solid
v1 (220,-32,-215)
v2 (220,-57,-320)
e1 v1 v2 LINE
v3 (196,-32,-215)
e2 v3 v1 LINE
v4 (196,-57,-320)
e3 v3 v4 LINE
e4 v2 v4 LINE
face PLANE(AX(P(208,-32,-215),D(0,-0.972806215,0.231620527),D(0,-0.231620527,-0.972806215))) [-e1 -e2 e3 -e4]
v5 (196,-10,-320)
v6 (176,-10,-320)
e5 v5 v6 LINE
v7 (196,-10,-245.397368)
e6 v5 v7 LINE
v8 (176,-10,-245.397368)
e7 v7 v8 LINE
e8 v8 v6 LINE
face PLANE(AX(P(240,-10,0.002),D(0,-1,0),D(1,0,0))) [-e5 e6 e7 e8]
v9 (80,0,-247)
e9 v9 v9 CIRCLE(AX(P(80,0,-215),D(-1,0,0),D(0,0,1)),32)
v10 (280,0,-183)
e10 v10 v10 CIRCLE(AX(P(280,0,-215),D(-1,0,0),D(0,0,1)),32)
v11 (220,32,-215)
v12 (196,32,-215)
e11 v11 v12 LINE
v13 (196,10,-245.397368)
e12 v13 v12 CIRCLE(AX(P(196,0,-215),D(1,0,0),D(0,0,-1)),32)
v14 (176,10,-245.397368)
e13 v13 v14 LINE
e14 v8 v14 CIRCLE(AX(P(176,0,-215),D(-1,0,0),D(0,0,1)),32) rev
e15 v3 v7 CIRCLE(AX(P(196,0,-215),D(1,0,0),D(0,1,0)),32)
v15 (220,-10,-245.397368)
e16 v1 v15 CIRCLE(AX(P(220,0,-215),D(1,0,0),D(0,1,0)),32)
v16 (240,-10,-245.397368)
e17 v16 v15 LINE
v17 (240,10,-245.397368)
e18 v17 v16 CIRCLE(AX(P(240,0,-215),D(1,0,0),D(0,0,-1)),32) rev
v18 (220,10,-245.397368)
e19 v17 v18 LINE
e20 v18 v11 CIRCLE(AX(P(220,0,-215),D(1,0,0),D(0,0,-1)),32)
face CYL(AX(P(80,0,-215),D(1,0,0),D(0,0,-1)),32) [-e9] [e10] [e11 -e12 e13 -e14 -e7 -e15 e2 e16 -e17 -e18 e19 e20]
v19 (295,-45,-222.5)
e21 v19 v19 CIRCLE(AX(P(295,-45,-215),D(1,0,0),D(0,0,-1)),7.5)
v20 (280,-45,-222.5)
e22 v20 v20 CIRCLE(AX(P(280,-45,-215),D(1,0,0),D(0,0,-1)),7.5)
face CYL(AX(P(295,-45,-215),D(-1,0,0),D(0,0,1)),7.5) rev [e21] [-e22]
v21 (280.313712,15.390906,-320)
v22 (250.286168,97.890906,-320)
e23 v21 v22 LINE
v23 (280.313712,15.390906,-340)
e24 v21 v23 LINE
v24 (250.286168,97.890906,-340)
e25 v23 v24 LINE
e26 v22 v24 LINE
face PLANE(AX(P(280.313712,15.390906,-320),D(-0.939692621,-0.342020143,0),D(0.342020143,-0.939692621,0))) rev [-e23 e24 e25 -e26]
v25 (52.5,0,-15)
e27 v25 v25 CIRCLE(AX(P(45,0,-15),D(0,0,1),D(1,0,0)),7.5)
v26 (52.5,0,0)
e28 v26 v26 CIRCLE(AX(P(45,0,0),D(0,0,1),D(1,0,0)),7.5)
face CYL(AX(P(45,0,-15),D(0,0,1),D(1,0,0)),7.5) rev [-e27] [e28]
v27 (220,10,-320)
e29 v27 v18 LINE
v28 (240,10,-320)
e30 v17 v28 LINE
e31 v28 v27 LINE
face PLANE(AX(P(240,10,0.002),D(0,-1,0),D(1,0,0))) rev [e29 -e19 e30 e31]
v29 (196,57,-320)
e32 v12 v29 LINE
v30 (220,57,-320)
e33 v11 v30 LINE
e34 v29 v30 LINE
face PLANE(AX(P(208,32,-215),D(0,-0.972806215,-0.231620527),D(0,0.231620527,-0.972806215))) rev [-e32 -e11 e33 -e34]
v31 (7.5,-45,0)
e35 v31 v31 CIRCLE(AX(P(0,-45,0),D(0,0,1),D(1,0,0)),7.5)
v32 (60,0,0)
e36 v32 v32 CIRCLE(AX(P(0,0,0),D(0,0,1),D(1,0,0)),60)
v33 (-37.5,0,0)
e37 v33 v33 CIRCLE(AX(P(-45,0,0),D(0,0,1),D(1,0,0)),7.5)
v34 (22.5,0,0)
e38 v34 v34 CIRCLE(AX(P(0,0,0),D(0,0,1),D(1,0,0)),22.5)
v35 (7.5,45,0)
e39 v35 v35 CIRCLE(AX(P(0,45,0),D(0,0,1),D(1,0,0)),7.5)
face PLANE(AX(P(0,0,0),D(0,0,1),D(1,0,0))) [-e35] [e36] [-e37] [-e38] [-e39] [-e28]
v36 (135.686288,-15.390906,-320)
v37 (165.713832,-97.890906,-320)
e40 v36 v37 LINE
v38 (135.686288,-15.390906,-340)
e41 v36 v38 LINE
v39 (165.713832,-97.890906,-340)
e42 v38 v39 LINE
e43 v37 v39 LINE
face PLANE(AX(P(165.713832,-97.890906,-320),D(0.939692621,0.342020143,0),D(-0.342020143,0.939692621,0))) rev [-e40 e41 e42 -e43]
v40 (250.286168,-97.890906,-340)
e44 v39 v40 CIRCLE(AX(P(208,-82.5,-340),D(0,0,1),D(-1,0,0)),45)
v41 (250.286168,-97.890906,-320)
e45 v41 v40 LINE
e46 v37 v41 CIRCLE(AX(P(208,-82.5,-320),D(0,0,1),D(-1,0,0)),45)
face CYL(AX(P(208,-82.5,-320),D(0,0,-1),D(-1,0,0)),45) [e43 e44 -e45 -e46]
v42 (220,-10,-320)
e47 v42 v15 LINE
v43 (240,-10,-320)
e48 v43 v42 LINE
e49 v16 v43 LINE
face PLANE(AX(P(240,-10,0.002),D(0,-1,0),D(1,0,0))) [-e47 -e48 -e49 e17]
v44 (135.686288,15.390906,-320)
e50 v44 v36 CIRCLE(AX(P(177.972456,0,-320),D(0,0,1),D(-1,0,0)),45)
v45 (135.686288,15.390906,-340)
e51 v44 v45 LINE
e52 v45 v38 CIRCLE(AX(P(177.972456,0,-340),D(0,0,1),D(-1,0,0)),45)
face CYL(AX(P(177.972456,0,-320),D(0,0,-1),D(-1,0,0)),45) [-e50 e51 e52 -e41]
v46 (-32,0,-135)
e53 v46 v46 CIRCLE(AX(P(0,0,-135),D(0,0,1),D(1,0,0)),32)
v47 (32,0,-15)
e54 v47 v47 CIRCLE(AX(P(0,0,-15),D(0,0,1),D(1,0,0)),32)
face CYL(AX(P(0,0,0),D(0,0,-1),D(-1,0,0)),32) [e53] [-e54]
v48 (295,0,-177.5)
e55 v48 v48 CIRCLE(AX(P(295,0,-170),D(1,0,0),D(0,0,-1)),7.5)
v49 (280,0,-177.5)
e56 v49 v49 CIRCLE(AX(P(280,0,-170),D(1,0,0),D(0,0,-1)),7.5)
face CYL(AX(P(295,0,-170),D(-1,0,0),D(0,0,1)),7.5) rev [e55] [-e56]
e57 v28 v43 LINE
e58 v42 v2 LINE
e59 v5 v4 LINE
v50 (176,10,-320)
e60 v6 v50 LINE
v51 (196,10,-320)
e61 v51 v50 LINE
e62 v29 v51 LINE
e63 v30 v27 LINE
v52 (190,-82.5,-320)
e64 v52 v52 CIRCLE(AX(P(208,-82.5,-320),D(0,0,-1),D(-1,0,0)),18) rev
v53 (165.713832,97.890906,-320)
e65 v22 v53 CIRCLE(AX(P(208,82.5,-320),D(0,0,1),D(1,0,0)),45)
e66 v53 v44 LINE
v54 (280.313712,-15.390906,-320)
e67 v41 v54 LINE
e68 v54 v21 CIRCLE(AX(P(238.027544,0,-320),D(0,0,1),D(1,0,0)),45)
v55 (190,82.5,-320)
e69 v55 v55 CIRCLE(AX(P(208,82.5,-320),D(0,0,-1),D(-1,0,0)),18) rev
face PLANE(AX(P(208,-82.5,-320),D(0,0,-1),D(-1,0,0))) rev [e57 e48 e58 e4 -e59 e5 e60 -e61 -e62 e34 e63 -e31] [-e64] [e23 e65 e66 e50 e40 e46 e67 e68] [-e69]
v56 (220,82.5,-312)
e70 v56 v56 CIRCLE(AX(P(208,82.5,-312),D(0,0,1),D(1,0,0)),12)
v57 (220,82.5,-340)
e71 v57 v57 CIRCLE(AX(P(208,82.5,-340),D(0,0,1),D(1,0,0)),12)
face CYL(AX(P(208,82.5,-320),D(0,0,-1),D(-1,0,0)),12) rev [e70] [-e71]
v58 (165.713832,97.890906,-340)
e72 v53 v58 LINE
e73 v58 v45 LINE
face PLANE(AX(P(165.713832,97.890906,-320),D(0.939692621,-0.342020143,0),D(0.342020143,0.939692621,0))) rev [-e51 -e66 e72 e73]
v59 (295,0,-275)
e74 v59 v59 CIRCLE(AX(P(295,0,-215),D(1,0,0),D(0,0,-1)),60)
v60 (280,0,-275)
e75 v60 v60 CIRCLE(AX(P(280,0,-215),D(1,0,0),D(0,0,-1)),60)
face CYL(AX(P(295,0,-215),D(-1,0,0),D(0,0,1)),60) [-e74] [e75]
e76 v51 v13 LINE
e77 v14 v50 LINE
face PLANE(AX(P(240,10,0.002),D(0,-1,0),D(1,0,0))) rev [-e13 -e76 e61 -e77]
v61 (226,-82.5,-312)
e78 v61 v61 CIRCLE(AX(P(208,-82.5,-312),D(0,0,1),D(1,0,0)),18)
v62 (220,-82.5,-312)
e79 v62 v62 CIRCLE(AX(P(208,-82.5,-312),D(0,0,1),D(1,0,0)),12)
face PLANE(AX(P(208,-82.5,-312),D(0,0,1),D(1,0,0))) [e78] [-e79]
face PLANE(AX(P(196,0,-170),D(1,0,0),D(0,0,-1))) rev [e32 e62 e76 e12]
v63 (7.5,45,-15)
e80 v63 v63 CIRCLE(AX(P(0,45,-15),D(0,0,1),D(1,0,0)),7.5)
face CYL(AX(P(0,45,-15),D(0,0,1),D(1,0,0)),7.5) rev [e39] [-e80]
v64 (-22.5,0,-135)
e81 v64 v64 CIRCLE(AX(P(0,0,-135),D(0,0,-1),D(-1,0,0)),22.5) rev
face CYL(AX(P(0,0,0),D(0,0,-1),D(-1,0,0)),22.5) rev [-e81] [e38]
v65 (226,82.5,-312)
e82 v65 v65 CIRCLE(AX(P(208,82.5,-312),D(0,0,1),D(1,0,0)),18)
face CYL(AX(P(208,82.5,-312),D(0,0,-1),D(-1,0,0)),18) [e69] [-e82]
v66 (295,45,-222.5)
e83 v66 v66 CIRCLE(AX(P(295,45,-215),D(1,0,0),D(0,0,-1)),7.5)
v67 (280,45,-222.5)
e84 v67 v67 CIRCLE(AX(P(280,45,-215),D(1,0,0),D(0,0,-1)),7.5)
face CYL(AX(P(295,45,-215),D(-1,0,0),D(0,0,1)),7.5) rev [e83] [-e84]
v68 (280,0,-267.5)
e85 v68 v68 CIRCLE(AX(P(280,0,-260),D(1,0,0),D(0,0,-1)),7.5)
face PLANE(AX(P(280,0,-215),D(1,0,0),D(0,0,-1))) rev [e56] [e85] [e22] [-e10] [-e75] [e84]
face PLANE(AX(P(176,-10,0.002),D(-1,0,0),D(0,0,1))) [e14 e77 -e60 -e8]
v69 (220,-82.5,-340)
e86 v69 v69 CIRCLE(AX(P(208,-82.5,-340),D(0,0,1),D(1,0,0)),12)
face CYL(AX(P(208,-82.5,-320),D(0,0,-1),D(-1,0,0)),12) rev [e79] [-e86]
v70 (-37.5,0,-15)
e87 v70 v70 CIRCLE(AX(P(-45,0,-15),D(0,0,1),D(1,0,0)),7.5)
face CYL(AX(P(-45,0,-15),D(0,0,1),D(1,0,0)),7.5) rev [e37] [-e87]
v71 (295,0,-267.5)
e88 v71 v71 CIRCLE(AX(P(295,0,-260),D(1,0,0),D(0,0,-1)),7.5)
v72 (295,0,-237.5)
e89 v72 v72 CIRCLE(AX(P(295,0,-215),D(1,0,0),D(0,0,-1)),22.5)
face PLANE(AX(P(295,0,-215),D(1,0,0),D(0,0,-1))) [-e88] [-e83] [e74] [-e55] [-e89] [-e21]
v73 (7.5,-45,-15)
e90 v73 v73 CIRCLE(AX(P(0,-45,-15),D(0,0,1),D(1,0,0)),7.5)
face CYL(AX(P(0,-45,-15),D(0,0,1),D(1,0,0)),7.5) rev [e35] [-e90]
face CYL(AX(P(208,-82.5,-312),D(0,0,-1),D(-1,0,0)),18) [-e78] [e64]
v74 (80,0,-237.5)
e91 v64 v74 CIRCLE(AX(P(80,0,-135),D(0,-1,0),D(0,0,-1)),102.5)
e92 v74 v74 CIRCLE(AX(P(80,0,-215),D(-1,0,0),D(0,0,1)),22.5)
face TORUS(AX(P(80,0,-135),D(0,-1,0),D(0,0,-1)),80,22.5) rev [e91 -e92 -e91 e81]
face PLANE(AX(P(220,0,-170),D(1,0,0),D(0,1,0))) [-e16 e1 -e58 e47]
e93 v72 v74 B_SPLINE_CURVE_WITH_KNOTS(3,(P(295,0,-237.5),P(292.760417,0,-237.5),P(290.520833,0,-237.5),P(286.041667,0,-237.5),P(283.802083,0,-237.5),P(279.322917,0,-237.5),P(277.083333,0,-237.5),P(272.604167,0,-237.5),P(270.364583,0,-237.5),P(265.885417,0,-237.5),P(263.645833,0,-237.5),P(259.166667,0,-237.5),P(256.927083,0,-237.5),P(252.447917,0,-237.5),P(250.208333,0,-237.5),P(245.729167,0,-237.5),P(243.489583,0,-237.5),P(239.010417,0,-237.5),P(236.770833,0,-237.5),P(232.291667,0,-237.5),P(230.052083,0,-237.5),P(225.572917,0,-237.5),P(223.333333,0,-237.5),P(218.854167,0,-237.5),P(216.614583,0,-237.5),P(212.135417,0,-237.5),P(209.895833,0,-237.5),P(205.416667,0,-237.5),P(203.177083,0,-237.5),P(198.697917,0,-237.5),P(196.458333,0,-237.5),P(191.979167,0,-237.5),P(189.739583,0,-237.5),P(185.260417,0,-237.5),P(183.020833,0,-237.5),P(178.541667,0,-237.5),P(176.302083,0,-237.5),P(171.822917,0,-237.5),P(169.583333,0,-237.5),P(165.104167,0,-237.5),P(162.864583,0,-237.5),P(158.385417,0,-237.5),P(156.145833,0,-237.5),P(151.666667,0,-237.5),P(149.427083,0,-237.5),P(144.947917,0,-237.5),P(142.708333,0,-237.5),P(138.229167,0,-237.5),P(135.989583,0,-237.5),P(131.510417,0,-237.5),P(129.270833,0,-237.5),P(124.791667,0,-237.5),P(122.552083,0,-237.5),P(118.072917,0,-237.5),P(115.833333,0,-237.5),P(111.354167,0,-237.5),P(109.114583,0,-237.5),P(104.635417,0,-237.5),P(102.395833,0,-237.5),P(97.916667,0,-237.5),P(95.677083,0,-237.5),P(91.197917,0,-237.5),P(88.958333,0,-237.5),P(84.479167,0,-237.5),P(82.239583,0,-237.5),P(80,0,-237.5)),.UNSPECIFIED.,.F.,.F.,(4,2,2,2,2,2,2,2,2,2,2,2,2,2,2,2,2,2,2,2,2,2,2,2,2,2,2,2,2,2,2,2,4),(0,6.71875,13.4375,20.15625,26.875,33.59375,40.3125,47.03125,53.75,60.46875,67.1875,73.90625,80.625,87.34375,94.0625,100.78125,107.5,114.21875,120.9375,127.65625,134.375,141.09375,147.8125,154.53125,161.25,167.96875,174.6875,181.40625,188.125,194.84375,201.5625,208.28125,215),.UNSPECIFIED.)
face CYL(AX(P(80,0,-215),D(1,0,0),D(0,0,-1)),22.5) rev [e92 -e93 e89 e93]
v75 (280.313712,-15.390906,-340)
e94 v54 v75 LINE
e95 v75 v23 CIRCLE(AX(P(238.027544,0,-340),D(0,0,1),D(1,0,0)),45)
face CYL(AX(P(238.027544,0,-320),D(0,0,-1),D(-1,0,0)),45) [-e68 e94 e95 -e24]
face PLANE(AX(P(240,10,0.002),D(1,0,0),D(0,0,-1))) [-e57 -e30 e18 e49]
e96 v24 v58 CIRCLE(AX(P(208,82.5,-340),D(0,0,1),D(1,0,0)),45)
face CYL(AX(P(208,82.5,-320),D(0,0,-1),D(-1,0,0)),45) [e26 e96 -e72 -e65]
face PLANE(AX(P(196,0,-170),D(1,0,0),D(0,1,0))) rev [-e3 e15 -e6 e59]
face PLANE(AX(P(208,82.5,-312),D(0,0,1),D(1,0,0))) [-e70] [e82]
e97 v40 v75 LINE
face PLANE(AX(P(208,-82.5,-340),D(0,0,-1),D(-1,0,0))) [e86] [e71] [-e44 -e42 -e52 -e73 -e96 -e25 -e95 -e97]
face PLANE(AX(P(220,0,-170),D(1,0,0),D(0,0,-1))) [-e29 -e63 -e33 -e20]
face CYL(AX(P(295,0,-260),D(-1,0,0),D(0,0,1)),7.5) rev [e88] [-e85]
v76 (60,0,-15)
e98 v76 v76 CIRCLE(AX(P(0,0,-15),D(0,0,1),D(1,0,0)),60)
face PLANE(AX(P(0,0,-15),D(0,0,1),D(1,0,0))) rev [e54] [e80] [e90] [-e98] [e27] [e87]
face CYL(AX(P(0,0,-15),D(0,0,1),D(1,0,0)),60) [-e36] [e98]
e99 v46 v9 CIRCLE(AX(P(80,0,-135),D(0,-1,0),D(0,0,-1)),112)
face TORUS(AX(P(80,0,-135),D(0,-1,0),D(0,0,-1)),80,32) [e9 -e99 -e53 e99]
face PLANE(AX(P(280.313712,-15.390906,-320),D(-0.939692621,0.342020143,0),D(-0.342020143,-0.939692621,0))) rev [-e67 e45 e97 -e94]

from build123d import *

# Parameters (mm, degrees)
SWEEP_THIN1_PROFILE_R    = 32
SWEEP_THIN1_PROFILE_R_2  = 22.5
BOSS_EXTRUDE1_START      = -15
SKETCH14_R               = 60
SKETCH14_R_2             = 22.5
SKETCH14_R_3             = 7.5
BOSS_EXTRUDE1_DEPTH      = 15
BOSS_EXTRUDE2_START      = 15
SKETCH15_R               = 60
SKETCH15_R_2             = 7.5
SKETCH15_R_3             = 22.5
BOSS_EXTRUDE2_DEPTH      = 15
SKETCH16_R               = 12
BOSS_EXTRUDE3_DEPTH      = 20
EXTRUDE_THIN1_REACH      = 455.521
EXTRUDE_THIN1_END_RADIUS = 32
SKETCH17_W               = 64
SKETCH17_H               = 20
RIB1_START               = -12
RIB1_DEPTH               = 24
SKETCH20_R               = 18
SKETCH20_R_2             = 12
BOSS_EXTRUDE4_DEPTH      = 8


# Read off the part's stored shape, not the designer's step: Rib1
with BuildPart() as part:
    # Sweep-Thin1: sweep along a path in Sketch1
    with BuildLine(Plane(origin=(0, 0, 0), x_dir=(-1, 0, 0), z_dir=(0, 1, 0))) as sweep_thin1_path:
        Line((0, 0), (0, -135))
        ThreePointArc((0, -135), (-23.431457505, -191.568542495), (-80, -215))
        Line((-80, -215), (-280, -215))
    # Sweep-Thin1 profile (on start of the path) → Sweep-Thin1 (sweep)
    with BuildSketch(Plane(origin=(0, 0, 0), x_dir=(-1, 0, 0), z_dir=(0, 0, -1))):
        Circle(SWEEP_THIN1_PROFILE_R)
        Circle(SWEEP_THIN1_PROFILE_R_2, mode=Mode.SUBTRACT)
    sweep(path=sweep_thin1_path.line)

    # Sketch14 → Boss-Extrude1 (add)
    with BuildSketch(Plane.XY.offset(BOSS_EXTRUDE1_START)):
        Circle(SKETCH14_R)
        with Locations(Location((0, 0, 0), (0, 0, 180))):
            Circle(SKETCH14_R_2, mode=Mode.SUBTRACT)
        with Locations((0, -45)):
            Circle(SKETCH14_R_3, mode=Mode.SUBTRACT)
        with Locations((-45, 0)):
            Circle(SKETCH14_R_3, mode=Mode.SUBTRACT)
        with Locations((0, 45)):
            Circle(SKETCH14_R_3, mode=Mode.SUBTRACT)
        with Locations((45, 0)):
            Circle(SKETCH14_R_3, mode=Mode.SUBTRACT)
    extrude(amount=BOSS_EXTRUDE1_DEPTH)

    # Sketch15 → Boss-Extrude2 (add)
    with BuildSketch(Plane.YZ.offset(280).offset(BOSS_EXTRUDE2_START)):
        with Locations(Location((0, -215, 0), (0, 0, 270))):
            Circle(SKETCH15_R)
        with Locations(Location((0, -260, 0), (0, 0, 270))):
            Circle(SKETCH15_R_2, mode=Mode.SUBTRACT)
        with Locations(Location((0, -215, 0), (0, 0, 270))):
            Circle(SKETCH15_R_3, mode=Mode.SUBTRACT)
        with Locations(Location((-45, -215, 0), (0, 0, 270))):
            Circle(SKETCH15_R_2, mode=Mode.SUBTRACT)
        with Locations(Location((0, -170, 0), (0, 0, 270))):
            Circle(SKETCH15_R_2, mode=Mode.SUBTRACT)
        with Locations(Location((45, -215, 0), (0, 0, 270))):
            Circle(SKETCH15_R_2, mode=Mode.SUBTRACT)
    extrude(amount=-BOSS_EXTRUDE2_DEPTH)



with BuildPart() as body_2:
    # Sketch16 → Boss-Extrude3 (new body)
    with BuildSketch(Plane(origin=(0, 0, -340), x_dir=(0, -1, 0), z_dir=(0, 0, 1))):
        with BuildLine():
            Line((15.39090645, 280.313712262), (97.89090645, 250.286167935))
            ThreePointArc((97.89090645, 250.286167935), (127.5, 208), (97.89090645, 165.713832065))
            Line((97.89090645, 165.713832065), (15.39090645, 135.686287738))
            ThreePointArc((15.39090645, 135.686287738), (0, 132.972455673), (-15.39090645, 135.686287738))
            Line((-15.39090645, 135.686287738), (-97.89090645, 165.713832065))
            ThreePointArc((-97.89090645, 165.713832065), (-127.5, 208), (-97.89090645, 250.286167935))
            Line((-97.89090645, 250.286167935), (-15.39090645, 280.313712262))
            ThreePointArc((-15.39090645, 280.313712262), (0, 283.027544327), (15.39090645, 280.313712262))
        make_face()
        with Locations(Location((82.5, 208, 0), (0, 0, 90))):
            Circle(SKETCH16_R, mode=Mode.SUBTRACT)
        with Locations(Location((-82.5, 208, 0), (0, 0, 90))):
            Circle(SKETCH16_R, mode=Mode.SUBTRACT)
    extrude(amount=BOSS_EXTRUDE3_DEPTH)


with BuildPart() as part_1:
    add(part.part)

    add(body_2.part)  # Extrude-Thin1 merges body 2
    # Extrude-Thin1: up to this cylinder (the profile starts outside it)
    extrude_thin1_end = Plane(origin=(208, 0, -215), z_dir=(1, 0, 0)) * Cylinder(EXTRUDE_THIN1_END_RADIUS, 976.042, mode=Mode.PRIVATE)
    # Sketch17 → Extrude-Thin1 (add, up to the surface)
    with BuildSketch(Plane.XY.offset(-320), mode=Mode.PRIVATE) as extrude_thin1_sk1:
        with Locations((208, 0)):
            Rectangle(SKETCH17_W, SKETCH17_H)
    extrude_thin1_tool1 = extrude(extrude_thin1_sk1.sketch, amount=EXTRUDE_THIN1_REACH, mode=Mode.PRIVATE) - extrude_thin1_end
    add(extrude_thin1_tool1.solids().sort_by_distance((208, 0, -320))[0])

    # Rib1 outline → Rib1 (add)
    with BuildSketch(Plane.YZ.offset(208).offset(RIB1_START)):
        with BuildLine():
            Line((57, -320), (32, -215))
            ThreePointArc((32, -215), (25.922962794, -233.761663039), (10, -245.397368307))
            Line((10, -245.397368307), (10, -320))
            Line((10, -320), (57, -320))
        make_face()
    rib1 = extrude(amount=RIB1_DEPTH)

    # Mirror1: Rib1 across plane
    add(rib1.mirror(Plane.ZX))

    # Sketch20 → Boss-Extrude4 (add)
    # profile 1 of 2: a face of its own
    with BuildSketch(Plane.XY.offset(-320)):
        with Locations(Location((208, 82.5, 0), (0, 0, 180))):
            Circle(SKETCH20_R)
        with Locations((208, 82.5)):
            Circle(SKETCH20_R_2, mode=Mode.SUBTRACT)
    # profile 2 of 2: a face of its own
    with BuildSketch(Plane.XY.offset(-320)):
        with Locations(Location((208, -82.5, 0), (0, 0, 180))):
            Circle(SKETCH20_R)
        with Locations((208, -82.5)):
            Circle(SKETCH20_R_2, mode=Mode.SUBTRACT)
    extrude(amount=BOSS_EXTRUDE4_DEPTH)


solid = part_1.part
